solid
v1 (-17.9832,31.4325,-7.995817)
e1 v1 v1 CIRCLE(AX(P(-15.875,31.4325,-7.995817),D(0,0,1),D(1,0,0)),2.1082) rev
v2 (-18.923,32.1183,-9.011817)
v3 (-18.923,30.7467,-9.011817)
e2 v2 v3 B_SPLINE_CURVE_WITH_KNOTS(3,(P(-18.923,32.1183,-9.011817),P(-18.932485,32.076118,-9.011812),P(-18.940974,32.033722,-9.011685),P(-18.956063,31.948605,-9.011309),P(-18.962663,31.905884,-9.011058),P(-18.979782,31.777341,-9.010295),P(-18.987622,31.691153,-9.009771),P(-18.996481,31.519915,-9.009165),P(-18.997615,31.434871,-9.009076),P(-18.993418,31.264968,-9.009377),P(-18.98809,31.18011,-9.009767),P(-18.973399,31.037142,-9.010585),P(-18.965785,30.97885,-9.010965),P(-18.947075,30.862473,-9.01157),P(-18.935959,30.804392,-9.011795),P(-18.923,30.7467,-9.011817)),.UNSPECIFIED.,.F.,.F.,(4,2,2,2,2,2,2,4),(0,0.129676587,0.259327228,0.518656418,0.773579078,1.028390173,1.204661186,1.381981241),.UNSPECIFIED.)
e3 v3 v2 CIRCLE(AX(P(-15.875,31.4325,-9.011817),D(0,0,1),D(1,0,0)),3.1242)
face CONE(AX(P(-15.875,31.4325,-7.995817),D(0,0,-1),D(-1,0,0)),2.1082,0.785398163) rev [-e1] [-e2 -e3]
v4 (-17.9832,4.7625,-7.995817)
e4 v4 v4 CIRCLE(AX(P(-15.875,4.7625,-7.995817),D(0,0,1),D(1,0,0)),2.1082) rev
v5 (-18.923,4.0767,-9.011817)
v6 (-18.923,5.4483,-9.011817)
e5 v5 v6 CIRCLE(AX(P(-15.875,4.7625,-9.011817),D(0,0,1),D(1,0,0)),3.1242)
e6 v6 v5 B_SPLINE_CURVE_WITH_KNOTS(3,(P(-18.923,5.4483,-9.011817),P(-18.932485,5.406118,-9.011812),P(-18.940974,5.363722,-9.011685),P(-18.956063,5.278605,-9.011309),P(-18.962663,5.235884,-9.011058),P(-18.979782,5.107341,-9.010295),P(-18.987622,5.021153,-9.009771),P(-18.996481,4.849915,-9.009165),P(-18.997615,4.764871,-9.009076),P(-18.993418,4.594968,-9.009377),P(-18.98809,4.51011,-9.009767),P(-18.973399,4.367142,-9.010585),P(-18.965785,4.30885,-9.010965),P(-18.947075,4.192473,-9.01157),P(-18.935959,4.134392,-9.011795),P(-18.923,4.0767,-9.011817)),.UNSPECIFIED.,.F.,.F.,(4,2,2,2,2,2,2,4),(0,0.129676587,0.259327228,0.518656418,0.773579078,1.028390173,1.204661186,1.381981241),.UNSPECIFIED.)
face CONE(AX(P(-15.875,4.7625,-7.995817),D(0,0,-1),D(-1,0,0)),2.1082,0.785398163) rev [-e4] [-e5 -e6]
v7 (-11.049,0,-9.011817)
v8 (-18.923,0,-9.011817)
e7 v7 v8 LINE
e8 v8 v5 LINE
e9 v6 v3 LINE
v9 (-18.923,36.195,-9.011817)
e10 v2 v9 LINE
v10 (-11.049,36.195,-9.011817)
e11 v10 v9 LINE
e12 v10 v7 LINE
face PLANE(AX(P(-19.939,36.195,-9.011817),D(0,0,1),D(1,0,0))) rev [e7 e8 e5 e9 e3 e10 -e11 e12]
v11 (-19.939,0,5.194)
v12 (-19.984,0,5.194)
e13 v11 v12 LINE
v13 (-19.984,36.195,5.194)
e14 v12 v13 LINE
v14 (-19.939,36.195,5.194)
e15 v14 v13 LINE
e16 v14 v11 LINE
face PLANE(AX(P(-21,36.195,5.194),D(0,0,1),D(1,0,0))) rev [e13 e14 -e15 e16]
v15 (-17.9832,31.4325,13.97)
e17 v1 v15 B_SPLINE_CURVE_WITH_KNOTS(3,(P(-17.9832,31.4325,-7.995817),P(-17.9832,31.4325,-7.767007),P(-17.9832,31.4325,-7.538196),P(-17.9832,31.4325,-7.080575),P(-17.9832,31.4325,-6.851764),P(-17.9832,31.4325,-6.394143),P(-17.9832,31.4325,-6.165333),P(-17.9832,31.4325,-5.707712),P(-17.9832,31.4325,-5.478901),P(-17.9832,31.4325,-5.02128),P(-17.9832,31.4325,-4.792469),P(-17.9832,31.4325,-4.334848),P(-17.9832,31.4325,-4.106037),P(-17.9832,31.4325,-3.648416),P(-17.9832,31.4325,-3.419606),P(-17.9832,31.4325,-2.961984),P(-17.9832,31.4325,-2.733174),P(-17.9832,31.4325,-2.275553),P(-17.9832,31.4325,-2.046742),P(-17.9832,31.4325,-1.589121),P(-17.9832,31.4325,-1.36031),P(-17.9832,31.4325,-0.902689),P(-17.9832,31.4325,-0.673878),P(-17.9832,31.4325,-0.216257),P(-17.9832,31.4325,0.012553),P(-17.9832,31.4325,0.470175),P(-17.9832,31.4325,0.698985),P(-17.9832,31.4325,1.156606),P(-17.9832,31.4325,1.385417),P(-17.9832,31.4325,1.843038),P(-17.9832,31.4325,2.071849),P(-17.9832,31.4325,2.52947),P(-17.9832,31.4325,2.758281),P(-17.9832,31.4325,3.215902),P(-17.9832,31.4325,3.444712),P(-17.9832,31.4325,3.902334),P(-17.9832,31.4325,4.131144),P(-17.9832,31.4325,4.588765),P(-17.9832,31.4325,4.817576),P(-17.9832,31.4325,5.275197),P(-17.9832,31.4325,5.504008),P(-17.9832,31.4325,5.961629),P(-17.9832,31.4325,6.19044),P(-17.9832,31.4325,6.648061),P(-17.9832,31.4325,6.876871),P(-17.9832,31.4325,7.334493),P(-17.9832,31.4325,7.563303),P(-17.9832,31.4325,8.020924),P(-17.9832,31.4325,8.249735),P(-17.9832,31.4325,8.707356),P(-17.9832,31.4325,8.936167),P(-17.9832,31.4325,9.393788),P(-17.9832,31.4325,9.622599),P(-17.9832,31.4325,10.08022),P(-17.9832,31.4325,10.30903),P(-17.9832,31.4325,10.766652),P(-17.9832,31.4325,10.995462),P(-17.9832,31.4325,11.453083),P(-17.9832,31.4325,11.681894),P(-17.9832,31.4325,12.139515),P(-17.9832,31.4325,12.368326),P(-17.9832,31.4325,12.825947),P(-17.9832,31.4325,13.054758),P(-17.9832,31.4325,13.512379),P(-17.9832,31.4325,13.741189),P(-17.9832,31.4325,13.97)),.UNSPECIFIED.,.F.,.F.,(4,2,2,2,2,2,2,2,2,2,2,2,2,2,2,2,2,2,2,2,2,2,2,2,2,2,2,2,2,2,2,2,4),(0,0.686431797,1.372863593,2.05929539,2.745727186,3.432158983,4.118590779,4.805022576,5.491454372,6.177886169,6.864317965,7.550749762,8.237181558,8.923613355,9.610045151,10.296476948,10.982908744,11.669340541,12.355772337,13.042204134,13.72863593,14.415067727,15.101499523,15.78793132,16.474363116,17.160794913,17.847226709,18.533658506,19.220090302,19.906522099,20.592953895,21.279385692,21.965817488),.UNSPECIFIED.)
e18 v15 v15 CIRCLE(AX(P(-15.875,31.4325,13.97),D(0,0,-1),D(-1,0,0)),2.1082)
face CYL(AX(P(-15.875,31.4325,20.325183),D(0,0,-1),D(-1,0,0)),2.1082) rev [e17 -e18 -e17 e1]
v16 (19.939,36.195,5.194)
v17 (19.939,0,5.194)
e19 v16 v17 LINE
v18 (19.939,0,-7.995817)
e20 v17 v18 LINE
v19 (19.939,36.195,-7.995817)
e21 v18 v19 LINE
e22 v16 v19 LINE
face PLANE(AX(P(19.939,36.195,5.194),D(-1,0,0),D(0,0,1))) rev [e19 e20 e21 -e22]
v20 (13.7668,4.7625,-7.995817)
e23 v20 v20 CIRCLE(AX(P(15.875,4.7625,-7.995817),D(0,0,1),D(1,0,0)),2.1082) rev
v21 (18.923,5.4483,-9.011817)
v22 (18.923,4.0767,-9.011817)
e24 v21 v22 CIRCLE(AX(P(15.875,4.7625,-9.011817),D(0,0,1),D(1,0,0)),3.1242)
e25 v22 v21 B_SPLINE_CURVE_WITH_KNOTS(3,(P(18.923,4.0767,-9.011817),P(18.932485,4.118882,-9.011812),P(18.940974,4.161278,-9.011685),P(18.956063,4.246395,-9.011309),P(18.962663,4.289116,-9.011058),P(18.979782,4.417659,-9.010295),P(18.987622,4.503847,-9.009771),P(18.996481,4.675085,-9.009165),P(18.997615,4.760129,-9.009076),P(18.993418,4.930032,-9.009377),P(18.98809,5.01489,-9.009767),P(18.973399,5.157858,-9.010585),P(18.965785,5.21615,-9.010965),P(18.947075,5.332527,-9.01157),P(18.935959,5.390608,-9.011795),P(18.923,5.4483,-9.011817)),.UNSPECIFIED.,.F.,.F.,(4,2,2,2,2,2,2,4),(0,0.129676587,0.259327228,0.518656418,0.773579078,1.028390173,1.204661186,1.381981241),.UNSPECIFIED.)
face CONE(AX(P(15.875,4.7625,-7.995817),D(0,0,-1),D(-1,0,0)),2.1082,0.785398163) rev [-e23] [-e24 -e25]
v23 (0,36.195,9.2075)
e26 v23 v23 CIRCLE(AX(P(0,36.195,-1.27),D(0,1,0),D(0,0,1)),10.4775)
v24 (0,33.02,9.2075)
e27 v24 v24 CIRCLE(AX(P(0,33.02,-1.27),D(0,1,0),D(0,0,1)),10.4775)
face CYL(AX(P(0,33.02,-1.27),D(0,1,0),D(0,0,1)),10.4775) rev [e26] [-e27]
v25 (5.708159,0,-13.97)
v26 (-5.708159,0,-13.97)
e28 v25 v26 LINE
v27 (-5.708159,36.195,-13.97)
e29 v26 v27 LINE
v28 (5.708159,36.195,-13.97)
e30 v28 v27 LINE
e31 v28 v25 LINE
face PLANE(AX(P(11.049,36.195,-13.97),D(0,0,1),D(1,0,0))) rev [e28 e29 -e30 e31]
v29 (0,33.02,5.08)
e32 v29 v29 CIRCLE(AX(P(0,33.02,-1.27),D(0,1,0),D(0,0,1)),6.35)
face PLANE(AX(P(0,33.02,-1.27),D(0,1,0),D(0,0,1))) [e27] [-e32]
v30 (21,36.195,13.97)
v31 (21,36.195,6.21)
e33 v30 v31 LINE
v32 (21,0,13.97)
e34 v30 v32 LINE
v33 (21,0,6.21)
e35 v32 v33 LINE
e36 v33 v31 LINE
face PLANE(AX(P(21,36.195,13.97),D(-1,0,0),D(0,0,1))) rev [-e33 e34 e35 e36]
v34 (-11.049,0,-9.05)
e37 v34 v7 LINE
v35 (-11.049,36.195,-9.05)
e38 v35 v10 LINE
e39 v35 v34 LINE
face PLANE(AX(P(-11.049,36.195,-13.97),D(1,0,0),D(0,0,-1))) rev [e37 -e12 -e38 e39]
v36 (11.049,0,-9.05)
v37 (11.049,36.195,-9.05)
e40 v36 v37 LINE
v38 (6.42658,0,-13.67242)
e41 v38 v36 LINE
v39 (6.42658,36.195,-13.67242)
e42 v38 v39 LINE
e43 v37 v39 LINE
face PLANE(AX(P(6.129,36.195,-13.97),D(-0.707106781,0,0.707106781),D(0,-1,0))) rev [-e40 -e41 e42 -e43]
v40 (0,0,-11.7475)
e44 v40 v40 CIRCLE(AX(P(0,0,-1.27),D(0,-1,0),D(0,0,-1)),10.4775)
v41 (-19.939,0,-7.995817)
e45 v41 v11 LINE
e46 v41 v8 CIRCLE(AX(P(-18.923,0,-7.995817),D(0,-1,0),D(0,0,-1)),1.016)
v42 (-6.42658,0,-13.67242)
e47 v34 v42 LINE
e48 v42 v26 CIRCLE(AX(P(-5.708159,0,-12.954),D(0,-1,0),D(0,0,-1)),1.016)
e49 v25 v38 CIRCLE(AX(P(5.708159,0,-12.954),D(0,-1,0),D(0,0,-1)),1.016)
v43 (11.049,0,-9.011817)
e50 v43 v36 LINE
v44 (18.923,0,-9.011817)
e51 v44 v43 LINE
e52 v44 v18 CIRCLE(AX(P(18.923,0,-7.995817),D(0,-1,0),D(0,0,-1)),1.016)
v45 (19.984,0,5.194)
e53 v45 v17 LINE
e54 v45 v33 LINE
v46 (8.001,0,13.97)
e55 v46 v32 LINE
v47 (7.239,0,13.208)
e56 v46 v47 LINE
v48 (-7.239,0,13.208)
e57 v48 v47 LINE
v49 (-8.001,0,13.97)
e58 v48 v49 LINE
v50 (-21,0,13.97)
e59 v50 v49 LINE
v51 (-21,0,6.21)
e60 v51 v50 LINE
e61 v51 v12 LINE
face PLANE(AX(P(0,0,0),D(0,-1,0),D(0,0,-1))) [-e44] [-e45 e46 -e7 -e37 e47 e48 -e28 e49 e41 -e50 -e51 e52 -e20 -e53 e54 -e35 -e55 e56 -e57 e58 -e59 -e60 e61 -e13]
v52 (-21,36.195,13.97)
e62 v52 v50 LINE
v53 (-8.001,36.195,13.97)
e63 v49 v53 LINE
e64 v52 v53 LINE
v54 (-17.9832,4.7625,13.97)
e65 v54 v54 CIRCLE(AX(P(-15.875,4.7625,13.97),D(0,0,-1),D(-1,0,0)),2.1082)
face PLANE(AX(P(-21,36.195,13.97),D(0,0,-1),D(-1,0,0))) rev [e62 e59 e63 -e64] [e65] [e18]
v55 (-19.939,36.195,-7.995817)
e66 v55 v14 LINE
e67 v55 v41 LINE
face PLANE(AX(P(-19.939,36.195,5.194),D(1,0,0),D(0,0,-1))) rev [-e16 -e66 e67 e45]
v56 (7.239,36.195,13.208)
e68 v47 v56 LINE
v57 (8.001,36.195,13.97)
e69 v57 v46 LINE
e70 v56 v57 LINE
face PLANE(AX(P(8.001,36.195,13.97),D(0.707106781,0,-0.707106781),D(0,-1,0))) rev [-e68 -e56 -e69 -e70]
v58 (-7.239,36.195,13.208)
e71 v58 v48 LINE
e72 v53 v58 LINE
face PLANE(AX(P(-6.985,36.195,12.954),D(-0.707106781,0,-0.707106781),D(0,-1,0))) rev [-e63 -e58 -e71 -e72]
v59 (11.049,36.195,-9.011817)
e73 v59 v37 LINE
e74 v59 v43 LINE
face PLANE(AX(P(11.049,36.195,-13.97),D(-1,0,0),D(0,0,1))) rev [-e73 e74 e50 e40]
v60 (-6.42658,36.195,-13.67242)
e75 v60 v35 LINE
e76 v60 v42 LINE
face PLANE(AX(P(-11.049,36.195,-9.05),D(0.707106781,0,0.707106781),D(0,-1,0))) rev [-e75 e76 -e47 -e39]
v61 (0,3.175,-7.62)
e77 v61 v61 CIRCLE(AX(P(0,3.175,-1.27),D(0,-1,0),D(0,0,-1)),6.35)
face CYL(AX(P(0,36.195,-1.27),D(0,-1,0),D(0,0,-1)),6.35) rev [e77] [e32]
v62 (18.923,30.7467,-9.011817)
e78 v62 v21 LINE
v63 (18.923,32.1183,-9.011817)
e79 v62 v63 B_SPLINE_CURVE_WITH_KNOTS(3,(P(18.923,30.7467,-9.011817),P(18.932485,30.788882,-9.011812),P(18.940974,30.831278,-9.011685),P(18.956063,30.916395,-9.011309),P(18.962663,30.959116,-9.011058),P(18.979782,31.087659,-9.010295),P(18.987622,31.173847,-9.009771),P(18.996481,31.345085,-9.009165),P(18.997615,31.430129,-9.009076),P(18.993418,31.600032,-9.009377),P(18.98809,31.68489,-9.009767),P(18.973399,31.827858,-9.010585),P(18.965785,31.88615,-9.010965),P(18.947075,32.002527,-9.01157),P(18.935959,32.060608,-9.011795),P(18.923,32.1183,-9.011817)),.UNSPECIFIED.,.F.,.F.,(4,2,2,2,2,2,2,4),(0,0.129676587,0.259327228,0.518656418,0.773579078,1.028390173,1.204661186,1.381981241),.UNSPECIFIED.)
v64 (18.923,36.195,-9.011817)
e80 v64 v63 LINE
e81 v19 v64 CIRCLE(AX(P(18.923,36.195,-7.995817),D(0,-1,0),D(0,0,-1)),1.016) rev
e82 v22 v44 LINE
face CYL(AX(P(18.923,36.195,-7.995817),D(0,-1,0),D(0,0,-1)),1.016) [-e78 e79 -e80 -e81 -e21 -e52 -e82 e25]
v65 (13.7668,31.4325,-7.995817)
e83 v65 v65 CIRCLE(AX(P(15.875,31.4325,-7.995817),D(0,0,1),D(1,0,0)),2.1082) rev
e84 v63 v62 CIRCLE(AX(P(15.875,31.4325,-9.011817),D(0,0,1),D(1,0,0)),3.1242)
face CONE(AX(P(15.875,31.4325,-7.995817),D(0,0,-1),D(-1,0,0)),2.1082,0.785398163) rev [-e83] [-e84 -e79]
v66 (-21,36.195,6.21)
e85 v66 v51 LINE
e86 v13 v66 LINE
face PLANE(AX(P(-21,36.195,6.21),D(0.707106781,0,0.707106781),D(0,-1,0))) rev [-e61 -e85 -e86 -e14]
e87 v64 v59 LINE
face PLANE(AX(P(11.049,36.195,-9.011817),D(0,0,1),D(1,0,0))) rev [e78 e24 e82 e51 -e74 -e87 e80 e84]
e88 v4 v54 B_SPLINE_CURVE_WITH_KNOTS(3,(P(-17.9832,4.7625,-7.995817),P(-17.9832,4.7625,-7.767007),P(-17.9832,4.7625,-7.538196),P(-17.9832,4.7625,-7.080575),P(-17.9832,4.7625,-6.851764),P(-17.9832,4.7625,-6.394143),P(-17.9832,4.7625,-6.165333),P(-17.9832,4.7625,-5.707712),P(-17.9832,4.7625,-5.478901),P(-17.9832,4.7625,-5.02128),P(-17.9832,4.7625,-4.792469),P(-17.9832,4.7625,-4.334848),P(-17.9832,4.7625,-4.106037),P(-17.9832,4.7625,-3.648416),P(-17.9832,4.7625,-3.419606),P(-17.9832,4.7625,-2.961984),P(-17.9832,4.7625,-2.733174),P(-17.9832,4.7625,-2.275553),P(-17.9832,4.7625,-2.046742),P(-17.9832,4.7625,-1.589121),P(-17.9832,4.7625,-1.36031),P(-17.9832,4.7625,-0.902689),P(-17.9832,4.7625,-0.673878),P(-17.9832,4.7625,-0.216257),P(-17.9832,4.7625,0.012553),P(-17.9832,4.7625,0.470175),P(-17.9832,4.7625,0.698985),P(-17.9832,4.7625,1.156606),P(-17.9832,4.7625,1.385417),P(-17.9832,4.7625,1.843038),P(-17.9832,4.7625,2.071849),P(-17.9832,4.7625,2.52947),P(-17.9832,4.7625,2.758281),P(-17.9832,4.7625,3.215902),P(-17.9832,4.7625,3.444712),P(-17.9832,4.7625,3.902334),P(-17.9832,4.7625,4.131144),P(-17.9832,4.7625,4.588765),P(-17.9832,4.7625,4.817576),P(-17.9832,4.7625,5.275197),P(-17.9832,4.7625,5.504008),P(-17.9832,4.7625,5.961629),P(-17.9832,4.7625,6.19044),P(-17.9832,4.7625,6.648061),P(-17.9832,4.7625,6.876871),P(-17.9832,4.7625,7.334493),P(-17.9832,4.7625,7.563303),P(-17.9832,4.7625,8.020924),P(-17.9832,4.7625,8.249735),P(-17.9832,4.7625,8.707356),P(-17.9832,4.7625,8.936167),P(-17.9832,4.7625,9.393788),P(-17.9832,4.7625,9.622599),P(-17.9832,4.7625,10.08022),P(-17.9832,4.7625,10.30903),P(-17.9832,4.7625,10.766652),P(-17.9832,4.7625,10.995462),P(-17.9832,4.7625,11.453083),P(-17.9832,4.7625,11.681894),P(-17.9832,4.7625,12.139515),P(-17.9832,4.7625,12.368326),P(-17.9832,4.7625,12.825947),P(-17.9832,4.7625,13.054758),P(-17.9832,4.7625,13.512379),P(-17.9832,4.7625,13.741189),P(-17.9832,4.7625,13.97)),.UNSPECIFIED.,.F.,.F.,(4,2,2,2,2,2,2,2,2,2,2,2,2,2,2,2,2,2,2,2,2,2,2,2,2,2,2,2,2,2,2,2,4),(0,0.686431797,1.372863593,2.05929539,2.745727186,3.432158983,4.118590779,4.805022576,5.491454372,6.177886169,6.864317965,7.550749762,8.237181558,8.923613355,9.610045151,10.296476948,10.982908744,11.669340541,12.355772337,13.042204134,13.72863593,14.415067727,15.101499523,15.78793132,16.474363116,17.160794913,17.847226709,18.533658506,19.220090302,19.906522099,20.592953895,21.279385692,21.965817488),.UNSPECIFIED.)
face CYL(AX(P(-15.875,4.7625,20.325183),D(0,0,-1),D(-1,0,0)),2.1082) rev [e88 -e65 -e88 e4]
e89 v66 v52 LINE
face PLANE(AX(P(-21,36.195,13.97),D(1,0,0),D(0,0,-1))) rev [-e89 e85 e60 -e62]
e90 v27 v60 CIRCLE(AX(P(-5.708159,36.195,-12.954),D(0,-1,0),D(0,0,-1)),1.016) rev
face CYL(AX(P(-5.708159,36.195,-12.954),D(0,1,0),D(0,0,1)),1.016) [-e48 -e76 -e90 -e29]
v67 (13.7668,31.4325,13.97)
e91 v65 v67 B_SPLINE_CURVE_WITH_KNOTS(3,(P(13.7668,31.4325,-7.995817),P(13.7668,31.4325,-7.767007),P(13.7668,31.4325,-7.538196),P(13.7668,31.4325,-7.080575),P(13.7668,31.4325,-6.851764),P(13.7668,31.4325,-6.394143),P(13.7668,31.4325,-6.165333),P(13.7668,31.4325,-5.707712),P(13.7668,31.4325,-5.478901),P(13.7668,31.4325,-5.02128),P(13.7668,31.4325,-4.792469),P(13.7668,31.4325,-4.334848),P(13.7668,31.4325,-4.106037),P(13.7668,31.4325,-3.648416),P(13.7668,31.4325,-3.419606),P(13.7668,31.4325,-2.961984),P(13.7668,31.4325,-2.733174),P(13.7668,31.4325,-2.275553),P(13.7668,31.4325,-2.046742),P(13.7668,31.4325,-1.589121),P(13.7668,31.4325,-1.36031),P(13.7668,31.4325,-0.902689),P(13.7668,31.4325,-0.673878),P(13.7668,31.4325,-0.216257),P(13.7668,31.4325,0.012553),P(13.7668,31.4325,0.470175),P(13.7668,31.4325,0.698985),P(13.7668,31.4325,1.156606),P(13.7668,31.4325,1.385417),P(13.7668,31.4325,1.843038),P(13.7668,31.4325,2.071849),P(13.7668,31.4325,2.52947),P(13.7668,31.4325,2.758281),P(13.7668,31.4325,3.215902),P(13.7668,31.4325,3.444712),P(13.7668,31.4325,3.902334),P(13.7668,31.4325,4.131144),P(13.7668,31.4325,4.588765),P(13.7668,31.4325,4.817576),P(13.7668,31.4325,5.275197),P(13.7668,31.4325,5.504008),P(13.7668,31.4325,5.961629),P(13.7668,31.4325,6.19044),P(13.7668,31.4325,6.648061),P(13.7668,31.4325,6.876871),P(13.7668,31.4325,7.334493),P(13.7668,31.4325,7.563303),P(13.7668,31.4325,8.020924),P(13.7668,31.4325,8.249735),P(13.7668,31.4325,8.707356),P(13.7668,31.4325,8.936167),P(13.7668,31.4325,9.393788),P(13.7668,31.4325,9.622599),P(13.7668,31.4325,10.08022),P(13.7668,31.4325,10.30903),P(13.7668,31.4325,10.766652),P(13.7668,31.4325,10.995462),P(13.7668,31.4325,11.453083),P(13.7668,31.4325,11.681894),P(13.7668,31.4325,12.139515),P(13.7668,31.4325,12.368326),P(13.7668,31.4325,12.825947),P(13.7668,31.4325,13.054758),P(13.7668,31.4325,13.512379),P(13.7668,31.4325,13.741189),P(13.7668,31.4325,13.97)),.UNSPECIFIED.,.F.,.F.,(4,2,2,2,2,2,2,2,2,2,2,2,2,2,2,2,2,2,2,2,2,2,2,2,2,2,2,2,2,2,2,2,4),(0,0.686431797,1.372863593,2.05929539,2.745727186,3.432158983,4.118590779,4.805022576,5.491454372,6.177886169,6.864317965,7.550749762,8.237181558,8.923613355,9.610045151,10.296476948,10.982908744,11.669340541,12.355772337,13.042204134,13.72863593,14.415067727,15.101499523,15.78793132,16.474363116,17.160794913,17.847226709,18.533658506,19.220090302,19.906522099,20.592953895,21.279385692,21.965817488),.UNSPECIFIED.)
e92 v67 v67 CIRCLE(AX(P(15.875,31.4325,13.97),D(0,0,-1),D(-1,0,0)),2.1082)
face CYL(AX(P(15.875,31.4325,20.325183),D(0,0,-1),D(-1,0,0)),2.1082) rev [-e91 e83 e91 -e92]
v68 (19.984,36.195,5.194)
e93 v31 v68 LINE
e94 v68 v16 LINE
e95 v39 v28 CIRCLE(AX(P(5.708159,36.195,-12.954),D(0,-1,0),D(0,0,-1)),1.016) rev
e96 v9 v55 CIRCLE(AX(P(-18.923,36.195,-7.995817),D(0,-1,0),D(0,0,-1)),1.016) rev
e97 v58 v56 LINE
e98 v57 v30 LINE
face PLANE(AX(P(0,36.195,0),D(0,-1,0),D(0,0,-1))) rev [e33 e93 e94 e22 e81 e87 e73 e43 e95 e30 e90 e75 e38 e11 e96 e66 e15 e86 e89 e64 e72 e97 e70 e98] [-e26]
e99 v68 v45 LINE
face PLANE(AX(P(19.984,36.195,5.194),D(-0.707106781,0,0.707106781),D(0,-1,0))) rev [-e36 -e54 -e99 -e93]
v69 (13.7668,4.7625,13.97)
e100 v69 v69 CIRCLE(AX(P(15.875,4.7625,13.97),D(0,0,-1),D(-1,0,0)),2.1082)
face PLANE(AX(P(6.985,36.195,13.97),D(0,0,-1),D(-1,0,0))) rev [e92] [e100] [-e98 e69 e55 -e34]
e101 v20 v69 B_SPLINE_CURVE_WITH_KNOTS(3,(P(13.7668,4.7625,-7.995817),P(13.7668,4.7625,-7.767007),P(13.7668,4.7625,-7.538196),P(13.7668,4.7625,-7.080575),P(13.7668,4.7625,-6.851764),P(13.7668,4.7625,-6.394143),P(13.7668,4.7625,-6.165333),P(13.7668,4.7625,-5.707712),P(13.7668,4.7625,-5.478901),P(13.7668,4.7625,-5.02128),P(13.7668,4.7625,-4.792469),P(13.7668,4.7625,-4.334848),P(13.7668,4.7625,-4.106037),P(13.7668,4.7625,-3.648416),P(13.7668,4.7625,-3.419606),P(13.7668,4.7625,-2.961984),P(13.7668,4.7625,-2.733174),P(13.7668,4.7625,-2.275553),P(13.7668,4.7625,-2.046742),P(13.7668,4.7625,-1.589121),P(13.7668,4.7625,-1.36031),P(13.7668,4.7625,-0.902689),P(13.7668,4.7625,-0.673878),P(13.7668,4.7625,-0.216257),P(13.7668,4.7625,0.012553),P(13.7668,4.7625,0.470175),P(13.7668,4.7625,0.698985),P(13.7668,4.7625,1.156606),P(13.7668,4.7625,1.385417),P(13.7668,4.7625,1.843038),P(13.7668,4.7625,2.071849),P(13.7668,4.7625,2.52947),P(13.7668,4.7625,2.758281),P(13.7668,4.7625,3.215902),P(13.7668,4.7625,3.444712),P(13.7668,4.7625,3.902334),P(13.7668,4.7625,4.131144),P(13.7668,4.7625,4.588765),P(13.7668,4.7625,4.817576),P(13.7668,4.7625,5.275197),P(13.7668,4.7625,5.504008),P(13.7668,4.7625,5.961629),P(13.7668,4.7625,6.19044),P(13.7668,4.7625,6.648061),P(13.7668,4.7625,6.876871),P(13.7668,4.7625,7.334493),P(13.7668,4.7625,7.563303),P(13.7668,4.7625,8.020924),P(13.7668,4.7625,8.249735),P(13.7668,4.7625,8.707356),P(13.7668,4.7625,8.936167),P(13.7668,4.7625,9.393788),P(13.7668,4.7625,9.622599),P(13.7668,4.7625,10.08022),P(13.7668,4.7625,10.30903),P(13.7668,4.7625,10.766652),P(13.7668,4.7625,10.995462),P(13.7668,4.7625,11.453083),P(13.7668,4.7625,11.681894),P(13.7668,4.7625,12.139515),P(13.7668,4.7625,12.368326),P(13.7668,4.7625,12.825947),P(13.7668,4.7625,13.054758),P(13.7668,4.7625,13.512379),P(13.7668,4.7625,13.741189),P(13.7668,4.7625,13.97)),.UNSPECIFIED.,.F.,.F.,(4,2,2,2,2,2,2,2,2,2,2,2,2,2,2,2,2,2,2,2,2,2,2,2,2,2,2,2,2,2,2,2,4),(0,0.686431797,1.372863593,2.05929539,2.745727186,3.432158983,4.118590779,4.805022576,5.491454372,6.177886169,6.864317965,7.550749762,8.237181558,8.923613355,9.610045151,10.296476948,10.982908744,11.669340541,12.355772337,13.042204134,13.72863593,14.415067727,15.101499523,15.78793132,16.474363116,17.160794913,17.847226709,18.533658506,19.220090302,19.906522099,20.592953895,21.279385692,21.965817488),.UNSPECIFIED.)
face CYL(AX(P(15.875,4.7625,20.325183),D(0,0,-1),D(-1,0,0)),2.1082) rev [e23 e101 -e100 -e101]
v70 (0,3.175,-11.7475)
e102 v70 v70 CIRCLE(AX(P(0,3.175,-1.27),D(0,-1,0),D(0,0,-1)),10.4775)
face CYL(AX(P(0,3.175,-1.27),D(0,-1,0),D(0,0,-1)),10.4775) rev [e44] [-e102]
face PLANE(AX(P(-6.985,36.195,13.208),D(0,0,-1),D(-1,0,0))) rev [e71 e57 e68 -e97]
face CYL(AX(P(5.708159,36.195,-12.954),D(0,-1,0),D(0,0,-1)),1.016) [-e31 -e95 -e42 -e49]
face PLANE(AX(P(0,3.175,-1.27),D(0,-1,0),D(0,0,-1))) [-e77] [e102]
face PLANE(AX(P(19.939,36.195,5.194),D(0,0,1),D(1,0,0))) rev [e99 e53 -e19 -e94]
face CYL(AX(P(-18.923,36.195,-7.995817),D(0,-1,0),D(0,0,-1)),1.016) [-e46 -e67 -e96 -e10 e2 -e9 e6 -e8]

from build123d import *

# Parameters (mm, degrees)
SKETCH1_R           = 6.35
BOSS_EXTRUDE1_DEPTH = 36.195
CHAMFER1_SIZE       = 4.92
CHAMFER2_SIZE       = 1.016
FILLET1_R           = 1.016
SKETCH2_R           = 10.4775
CUT_EXTRUDE1_DEPTH  = 3.175
CUT_EXTRUDE2_START  = -3.175
SKETCH3_R           = 10.4775
CUT_EXTRUDE2_DEPTH  = 3.175
SKETCH4_R           = 2.1082
CUT_EXTRUDE3_DEPTH  = 29.337
CHAMFER3_SIZE       = 1.016


with BuildPart() as part:
    # Sketch1 → Boss-Extrude1 (new body)
    with BuildSketch(Plane(origin=(0, 0, 0), x_dir=(1, 0, 0), z_dir=(0, 1, 0))):
        Polygon((-21, -13.97), (-6.985, -13.97), (-6.985, -13.208), (6.985, -13.208), (6.985, -13.97), (21, -13.97), (21, -5.194), (19.939, -5.194), (19.939, 9.011817488), (11.049, 9.011817488), (11.049, 13.97), (-11.049, 13.97), (-11.049, 9.011817488), (-19.939, 9.011817488), (-19.939, -5.194), (-21, -5.194), align=None)
        with Locations(Location((0, 1.27, 0), (0, 0, 270))):
            Circle(SKETCH1_R, mode=Mode.SUBTRACT)
    extrude(amount=BOSS_EXTRUDE1_DEPTH)

    # Chamfer1
    chamfer1_edges = [part.edges().sort_by_distance(p)[0] for p in [
        (-11.049, 18.0975, -13.97),
        (11.049, 18.0975, -13.97),
    ]]
    chamfer(chamfer1_edges, length=CHAMFER1_SIZE)

    # Chamfer2
    # the kernel refuses this chamfer: 1.016 mm, written as the material it takes off along each edge
    with BuildSketch(Plane(origin=(6.985, -2.612829916, 13.97), x_dir=(0.9996219169112968, 0, 0.027495876610587285), z_dir=(0, 1, 0))) as chamfer2_piece_1_section:
        Polygon((CHAMFER2_SIZE * 0.999621916911, CHAMFER2_SIZE * 0.0274958766106), (-CHAMFER2_SIZE * 0.0274958766106, CHAMFER2_SIZE * 0.999621916911), (0, 0), align=None)
    chamfer2_piece_1 = extrude(amount=41.420659832, mode=Mode.PRIVATE)
    chamfer2_piece_1 = split(chamfer2_piece_1, bisect_by=Plane(origin=(7.342590456, 18.0975, 13.208), z_dir=(0, 0, 1)), keep=Keep.TOP, mode=Mode.PRIVATE)
    add(chamfer2_piece_1, mode=Mode.SUBTRACT)
    with BuildSketch(Plane(origin=(-6.985, -2.612829916, 13.97), x_dir=(0.027495876610586455, 0, -0.9996219169112968), z_dir=(0, 1, 0))) as chamfer2_piece_2_section:
        Polygon((CHAMFER2_SIZE * 0.999621916911, CHAMFER2_SIZE * 0.0274958766106), (-CHAMFER2_SIZE * 0.0274958766106, CHAMFER2_SIZE * 0.999621916911), (0, 0), align=None)
    chamfer2_piece_2 = extrude(amount=41.420659832, mode=Mode.PRIVATE)
    chamfer2_piece_2 = split(chamfer2_piece_2, bisect_by=Plane(origin=(-7.342590456, 18.0975, 13.208), z_dir=(0, 0, 1)), keep=Keep.TOP, mode=Mode.PRIVATE)
    add(chamfer2_piece_2, mode=Mode.SUBTRACT)
    with BuildSketch(Plane(origin=(-21, -2.612829916, 5.194), x_dir=(0.9996219169112968, 0, -0.02749587661058551), z_dir=(0, 1, 0))) as chamfer2_piece_3:
        Polygon((CHAMFER2_SIZE * 0.999621916911, -CHAMFER2_SIZE * 0.0274958766106), (-CHAMFER2_SIZE * 0.0274958766106, -CHAMFER2_SIZE * 0.999621916911), (0, 0), align=None)
    extrude(amount=41.420659832, mode=Mode.SUBTRACT)
    with BuildSketch(Plane(origin=(21, -2.612829916, 5.194), x_dir=(-0.9996219169112968, 0, -0.027495876610584665), z_dir=(0, 1, 0))) as chamfer2_piece_4:
        Polygon((CHAMFER2_SIZE * 0.999621916911, CHAMFER2_SIZE * 0.0274958766106), (-CHAMFER2_SIZE * 0.0274958766106, CHAMFER2_SIZE * 0.999621916911), (0, 0), align=None)
    extrude(amount=41.420659832, mode=Mode.SUBTRACT)

    # Fillet1
    fillet1_edges = [part.edges().sort_by_distance(p)[0] for p in [
        (-19.939, 18.0975, -9.011817488),
        (19.939, 18.0975, -9.011817488),
        (-6.129, 18.0975, -13.97),
        (6.129, 18.0975, -13.97),
    ]]
    fillet(fillet1_edges, radius=FILLET1_R)

    # Sketch2 → Cut-Extrude1 (cut)
    with BuildSketch(Plane(origin=(0, 36.195, 0), x_dir=(1, 0, 0), z_dir=(0, 1, 0))):
        with Locations(Location((0, 1.27, 0), (0, 0, 270))):
            Circle(SKETCH2_R)
    extrude(amount=-CUT_EXTRUDE1_DEPTH, mode=Mode.SUBTRACT)

    # Sketch3 → Cut-Extrude2 (cut)
    with BuildSketch(Plane.XZ.offset(CUT_EXTRUDE2_START)):
        with Locations(Location((0, -1.27, 0), (0, 0, 90))):
            Circle(SKETCH3_R)
    extrude(amount=CUT_EXTRUDE2_DEPTH, mode=Mode.SUBTRACT)

    # Sketch4 → Cut-Extrude3 (cut)
    with BuildSketch(Plane(origin=(0, 0, -9.011817488), x_dir=(-1, 0, 0), z_dir=(0, 0, -1))):
        with Locations((-15.875, 4.7625)):
            Circle(SKETCH4_R)
        with Locations((-15.875, 31.4325)):
            Circle(SKETCH4_R)
        with Locations((15.875, 31.4325)):
            Circle(SKETCH4_R)
        with Locations((15.875, 4.7625)):
            Circle(SKETCH4_R)
    extrude(amount=-CUT_EXTRUDE3_DEPTH, mode=Mode.SUBTRACT)

    # Chamfer3
    # the kernel refuses this chamfer: 1.016 mm, written as the material it takes off along each edge
    with BuildSketch(Plane(origin=(-15.875, 4.7625, -9.011817488), x_dir=(-1, 0, 0), z_dir=(0, -1, 0))) as chamfer3_piece_1:
        Polygon((2.1082 + CHAMFER3_SIZE, 0), (2.1082, -CHAMFER3_SIZE), (2.1082, 0), align=None)
    revolve(axis=Axis((-15.875, 4.7625, -9.011817488), (0, 0, -1)), mode=Mode.SUBTRACT)
    with BuildSketch(Plane(origin=(-15.875, 31.4325, -9.011817488), x_dir=(-1, 0, 0), z_dir=(0, -1, 0))) as chamfer3_piece_2:
        Polygon((2.1082 + CHAMFER3_SIZE, 0), (2.1082, -CHAMFER3_SIZE), (2.1082, 0), align=None)
    revolve(axis=Axis((-15.875, 31.4325, -9.011817488), (0, 0, -1)), mode=Mode.SUBTRACT)
    with BuildSketch(Plane(origin=(15.875, 31.4325, -9.011817488), x_dir=(-1, 0, 0), z_dir=(0, -1, 0))) as chamfer3_piece_3:
        Polygon((2.1082 + CHAMFER3_SIZE, 0), (2.1082, -CHAMFER3_SIZE), (2.1082, 0), align=None)
    revolve(axis=Axis((15.875, 31.4325, -9.011817488), (0, 0, -1)), mode=Mode.SUBTRACT)
    with BuildSketch(Plane(origin=(15.875, 4.7625, -9.011817488), x_dir=(-1, 0, 0), z_dir=(0, -1, 0))) as chamfer3_piece_4:
        Polygon((2.1082 + CHAMFER3_SIZE, 0), (2.1082, -CHAMFER3_SIZE), (2.1082, 0), align=None)
    revolve(axis=Axis((15.875, 4.7625, -9.011817488), (0, 0, -1)), mode=Mode.SUBTRACT)


solid = part.part
